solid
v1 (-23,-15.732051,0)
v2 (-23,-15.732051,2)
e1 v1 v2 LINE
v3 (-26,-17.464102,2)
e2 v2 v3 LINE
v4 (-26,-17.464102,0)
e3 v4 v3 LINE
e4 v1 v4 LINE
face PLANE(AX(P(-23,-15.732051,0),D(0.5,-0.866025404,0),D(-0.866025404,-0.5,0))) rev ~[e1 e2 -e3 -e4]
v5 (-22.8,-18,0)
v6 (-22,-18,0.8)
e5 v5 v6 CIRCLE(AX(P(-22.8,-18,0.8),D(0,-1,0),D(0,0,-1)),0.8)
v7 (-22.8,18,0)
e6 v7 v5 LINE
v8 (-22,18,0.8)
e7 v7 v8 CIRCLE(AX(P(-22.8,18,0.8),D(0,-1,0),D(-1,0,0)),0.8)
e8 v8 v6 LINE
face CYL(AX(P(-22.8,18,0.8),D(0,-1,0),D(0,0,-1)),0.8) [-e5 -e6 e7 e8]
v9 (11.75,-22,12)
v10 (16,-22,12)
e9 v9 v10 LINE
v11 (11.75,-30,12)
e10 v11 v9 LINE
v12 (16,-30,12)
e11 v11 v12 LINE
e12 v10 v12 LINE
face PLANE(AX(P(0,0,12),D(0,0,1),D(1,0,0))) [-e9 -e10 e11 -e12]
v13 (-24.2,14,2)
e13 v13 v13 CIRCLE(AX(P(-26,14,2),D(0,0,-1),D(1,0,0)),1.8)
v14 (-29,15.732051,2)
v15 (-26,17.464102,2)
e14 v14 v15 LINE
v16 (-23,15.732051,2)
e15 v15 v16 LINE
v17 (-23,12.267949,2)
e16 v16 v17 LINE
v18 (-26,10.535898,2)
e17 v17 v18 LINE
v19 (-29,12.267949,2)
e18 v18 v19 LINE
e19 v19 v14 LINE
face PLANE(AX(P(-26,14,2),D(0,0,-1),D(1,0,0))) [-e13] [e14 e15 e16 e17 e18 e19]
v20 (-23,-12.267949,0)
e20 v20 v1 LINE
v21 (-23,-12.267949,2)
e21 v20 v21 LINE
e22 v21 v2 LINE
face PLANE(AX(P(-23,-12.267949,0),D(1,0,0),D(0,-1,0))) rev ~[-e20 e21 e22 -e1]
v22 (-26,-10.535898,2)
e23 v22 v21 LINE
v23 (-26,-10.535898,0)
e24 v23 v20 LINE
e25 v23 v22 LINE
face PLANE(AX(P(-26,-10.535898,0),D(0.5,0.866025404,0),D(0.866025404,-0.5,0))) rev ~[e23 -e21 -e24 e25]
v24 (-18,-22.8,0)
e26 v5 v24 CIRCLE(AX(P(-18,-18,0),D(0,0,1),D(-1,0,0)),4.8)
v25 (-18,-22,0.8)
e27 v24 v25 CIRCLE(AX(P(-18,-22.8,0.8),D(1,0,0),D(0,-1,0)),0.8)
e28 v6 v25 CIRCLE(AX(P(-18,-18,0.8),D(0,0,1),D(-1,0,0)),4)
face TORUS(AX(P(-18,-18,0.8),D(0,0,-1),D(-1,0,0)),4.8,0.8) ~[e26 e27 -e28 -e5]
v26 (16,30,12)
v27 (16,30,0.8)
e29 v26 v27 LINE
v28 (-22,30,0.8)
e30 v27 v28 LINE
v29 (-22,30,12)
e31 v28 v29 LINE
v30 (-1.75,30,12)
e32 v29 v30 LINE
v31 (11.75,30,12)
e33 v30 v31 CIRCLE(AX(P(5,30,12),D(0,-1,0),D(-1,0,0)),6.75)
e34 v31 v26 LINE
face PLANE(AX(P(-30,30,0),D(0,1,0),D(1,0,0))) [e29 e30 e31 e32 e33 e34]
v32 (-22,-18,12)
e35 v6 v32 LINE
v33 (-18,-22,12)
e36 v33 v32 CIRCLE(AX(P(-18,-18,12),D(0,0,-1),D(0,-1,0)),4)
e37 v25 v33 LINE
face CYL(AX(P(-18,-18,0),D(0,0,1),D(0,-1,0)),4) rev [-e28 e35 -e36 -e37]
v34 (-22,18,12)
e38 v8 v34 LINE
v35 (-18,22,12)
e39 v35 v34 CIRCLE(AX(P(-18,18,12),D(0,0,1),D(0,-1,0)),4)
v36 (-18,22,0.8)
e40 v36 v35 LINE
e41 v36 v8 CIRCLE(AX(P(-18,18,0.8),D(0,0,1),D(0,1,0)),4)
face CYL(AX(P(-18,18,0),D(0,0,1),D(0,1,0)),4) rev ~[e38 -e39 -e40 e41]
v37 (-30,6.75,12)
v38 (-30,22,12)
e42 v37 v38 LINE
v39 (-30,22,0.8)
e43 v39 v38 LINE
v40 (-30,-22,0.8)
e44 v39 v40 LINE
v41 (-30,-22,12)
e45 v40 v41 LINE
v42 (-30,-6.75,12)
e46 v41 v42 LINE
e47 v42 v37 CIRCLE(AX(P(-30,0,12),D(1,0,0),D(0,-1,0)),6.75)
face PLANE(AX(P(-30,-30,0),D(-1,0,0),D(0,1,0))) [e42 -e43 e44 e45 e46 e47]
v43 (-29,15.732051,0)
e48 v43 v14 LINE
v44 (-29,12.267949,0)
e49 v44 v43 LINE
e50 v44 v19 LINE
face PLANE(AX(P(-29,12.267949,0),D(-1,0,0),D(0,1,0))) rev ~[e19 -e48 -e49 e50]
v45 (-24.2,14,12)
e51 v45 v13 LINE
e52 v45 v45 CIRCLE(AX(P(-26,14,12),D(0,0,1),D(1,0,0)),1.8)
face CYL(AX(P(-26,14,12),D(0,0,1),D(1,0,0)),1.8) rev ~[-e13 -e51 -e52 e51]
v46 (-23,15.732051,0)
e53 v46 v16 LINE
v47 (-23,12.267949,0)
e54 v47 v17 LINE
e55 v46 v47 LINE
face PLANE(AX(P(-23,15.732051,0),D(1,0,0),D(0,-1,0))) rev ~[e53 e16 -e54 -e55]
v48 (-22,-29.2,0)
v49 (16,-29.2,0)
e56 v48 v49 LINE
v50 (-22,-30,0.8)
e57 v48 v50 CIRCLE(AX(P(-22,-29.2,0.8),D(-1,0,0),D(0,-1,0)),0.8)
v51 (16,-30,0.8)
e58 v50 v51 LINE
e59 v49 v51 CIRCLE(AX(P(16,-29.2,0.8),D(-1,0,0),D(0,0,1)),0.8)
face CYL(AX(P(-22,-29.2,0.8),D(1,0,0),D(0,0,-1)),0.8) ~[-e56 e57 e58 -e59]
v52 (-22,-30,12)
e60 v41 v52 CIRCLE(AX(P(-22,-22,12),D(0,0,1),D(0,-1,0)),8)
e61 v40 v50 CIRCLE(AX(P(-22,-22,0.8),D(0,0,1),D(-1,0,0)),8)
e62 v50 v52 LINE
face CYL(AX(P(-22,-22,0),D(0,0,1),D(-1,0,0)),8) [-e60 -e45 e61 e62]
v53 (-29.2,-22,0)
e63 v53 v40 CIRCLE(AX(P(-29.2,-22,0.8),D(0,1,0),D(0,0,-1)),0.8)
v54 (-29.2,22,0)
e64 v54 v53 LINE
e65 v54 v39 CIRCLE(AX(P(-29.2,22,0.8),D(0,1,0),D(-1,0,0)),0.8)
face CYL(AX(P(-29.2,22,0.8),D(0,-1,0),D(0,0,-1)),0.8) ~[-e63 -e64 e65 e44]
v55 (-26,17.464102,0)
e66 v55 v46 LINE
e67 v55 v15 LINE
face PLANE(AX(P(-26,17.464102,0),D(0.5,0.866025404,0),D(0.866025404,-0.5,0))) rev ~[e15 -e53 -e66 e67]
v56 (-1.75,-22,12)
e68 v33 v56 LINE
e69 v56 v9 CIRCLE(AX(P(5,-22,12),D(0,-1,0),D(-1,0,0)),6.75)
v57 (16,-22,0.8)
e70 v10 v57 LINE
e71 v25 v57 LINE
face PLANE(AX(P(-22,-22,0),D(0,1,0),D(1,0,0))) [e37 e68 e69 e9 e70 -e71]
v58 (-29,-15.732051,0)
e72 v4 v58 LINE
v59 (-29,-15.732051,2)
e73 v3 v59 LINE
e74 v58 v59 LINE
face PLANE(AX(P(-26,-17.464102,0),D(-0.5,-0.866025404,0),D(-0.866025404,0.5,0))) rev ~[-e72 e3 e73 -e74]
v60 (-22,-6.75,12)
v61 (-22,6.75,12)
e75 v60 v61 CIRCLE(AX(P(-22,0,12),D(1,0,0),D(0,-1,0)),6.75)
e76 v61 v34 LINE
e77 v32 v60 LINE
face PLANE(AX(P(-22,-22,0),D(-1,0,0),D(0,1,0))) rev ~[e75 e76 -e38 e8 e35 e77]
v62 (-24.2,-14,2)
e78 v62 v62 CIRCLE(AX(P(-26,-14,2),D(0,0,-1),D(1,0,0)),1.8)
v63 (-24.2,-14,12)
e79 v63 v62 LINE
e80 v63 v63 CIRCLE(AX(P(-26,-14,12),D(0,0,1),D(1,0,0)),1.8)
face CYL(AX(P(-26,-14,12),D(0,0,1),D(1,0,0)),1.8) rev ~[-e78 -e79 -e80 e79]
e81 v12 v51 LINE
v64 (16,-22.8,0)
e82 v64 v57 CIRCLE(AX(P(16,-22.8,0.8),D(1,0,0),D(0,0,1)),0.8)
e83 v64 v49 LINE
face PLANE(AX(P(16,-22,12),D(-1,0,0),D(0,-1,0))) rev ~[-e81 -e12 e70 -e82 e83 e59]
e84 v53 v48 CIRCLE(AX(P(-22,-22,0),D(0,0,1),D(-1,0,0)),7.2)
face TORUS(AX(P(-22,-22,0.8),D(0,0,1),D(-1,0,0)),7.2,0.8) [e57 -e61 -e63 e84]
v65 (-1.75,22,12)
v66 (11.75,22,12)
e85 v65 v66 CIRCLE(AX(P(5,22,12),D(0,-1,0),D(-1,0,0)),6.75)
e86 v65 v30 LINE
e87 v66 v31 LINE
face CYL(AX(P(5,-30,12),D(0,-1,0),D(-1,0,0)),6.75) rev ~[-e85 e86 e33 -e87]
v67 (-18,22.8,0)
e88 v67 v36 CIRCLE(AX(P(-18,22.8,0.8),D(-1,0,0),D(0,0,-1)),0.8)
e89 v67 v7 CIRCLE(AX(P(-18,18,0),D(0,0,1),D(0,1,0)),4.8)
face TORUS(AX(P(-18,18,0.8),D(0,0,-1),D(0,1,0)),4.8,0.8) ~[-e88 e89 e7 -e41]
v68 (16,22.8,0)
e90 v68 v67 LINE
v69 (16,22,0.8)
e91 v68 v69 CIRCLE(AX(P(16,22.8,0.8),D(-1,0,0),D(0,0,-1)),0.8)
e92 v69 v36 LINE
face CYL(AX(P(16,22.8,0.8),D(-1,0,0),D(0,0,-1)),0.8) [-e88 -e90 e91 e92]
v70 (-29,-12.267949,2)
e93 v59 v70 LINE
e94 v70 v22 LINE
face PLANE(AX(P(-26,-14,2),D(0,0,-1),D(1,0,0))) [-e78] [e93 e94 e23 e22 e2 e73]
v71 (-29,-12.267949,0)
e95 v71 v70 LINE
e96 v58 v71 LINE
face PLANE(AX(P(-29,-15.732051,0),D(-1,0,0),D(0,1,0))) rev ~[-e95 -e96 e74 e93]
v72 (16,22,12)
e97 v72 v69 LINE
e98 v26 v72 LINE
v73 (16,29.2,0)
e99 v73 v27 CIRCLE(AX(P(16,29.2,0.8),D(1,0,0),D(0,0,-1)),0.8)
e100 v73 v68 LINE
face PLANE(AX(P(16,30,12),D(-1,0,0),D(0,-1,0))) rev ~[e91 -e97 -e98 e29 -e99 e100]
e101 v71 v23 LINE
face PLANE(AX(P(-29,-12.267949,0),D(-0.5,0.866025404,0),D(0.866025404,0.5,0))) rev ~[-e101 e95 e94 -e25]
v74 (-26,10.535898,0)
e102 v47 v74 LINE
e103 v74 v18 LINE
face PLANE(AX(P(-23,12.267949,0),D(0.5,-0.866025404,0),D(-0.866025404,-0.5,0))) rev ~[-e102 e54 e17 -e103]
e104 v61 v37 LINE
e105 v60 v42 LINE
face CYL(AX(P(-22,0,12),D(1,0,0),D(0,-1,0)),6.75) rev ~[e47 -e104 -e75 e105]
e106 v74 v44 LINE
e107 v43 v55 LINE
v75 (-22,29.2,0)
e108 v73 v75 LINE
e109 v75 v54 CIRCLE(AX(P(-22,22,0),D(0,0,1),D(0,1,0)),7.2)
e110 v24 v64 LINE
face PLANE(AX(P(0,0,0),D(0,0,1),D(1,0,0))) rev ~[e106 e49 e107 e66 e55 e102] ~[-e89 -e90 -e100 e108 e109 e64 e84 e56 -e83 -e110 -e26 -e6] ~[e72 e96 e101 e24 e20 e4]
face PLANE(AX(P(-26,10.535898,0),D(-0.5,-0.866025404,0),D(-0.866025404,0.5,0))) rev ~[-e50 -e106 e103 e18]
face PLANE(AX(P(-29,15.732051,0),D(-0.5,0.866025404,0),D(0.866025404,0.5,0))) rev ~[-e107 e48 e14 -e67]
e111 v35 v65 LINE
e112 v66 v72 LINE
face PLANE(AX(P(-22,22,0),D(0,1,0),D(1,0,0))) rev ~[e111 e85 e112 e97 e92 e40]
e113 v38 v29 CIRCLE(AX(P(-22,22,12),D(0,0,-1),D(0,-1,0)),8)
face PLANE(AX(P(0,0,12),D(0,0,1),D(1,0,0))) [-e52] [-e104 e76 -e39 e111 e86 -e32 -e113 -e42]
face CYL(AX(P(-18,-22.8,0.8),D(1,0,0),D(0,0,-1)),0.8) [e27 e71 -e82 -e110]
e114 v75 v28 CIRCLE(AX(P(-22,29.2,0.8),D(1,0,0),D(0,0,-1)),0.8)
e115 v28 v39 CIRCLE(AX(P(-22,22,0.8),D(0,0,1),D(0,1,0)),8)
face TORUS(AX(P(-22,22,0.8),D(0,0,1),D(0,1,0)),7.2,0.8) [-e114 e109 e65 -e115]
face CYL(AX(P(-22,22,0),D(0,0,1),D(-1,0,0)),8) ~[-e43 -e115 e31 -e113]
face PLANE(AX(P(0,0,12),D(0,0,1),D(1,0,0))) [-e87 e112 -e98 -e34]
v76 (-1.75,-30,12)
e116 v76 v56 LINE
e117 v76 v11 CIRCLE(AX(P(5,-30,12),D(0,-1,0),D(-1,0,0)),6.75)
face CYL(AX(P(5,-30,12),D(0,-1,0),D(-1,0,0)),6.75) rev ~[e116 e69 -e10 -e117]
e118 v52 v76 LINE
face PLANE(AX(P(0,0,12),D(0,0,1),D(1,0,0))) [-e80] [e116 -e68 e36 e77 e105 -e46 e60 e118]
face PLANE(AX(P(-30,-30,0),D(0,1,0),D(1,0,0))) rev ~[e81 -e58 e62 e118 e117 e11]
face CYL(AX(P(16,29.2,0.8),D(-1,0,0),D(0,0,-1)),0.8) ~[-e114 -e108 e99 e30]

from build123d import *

# Parameters (mm, degrees)
F0_W      = 60
F0_H      = 60
F0_W_2    = 44
F0_H_2    = 44
F1_DEPTH  = 12
F3_DEPTH  = 25
F4_R      = 8
F5_R      = 4
F7_DEPTH  = 25
F9_DEPTH  = 60.001
F10_R     = 1.8
F11_DEPTH = 25
F12_R     = 0.8
F13_R     = 1.8
F14_DEPTH = 2


# Not quite as in the source:
# - a feature names something its author has since deleted; it is built from what else it names


with BuildPart() as f1:
    # F0 (on Top) → F1 (new body)
    with BuildSketch(Plane.XY):
        Rectangle(F0_W, F0_H)
        Rectangle(F0_W_2, F0_H_2, mode=Mode.SUBTRACT)
    extrude(amount=F1_DEPTH)

    # F2 (on face) → F3 (cut)
    with BuildSketch(Plane.XY.offset(12)):
        Polygon((30, -30), (30, 30), (16, 30), (16, 22), (22, 22), (22, -22), (16, -22), (16, -30), align=None)
    extrude(amount=-F3_DEPTH, mode=Mode.SUBTRACT)

    # F4
    f4_edges = [f1.edges().sort_by_distance(p)[0] for p in [
        (-30, -30, 6),
        (-30, 30, 6),
    ]]
    fillet(f4_edges, radius=F4_R)

    # F5
    f5_edges = [f1.edges().sort_by_distance(p)[0] for p in [
        (-22, 22, 6),
        (-22, -22, 6),
    ]]
    fillet(f5_edges, radius=F5_R)

    # F6 (on face) → F7 (cut)
    with BuildSketch(Plane.YZ.offset(-22)):
        with BuildLine():
            ThreePointArc((-6.75, 12), (0, 5.25), (6.75, 12))
            Line((6.75, 12), (-6.75, 12))
        make_face()
    extrude(amount=-F7_DEPTH, mode=Mode.SUBTRACT)

    # F8 (on face) → F9 (cut, through all)
    with BuildSketch(Plane.XZ.offset(30)):
        with BuildLine():
            ThreePointArc((-1.75, 12), (5, 5.25), (11.75, 12))
            Line((11.75, 12), (-1.75, 12))
        make_face()
    extrude(amount=-F9_DEPTH, mode=Mode.SUBTRACT)

    # F10 (on face) → F11 (cut)
    with BuildSketch(Plane.XY.offset(12)):
        with Locations((-26, 14)):
            Circle(F10_R)
        with Locations((-26, -14)):
            Circle(F10_R)
    extrude(amount=-F11_DEPTH, mode=Mode.SUBTRACT)

    # F12
    f12_edges = [f1.edges().sort_by_distance(p)[0] for p in [
        (-3, -30, 0),
        (-20.828427, 20.828427, 0),
    ]]
    fillet(f12_edges, radius=F12_R)

    # F13 (on face) → F14 (cut)
    with BuildSketch(Plane(origin=(0, 0, 0), x_dir=(1, 0, 0), z_dir=(0, 0, -1))):
        Polygon((-23, 12.2679491924), (-23, 15.7320508076), (-26, 17.4641016151), (-29, 15.7320508076), (-29, 12.2679491924), (-26, 10.5358983849), align=None)
        with Locations((-26, 14)):
            Circle(F13_R, mode=Mode.SUBTRACT)
        Polygon((-26, -17.4641016151), (-23, -15.7320508076), (-23, -12.2679491924), (-26, -10.5358983849), (-29, -12.2679491924), (-29, -15.7320508076), align=None)
        with Locations((-26, -14)):
            Circle(F13_R, mode=Mode.SUBTRACT)
    extrude(amount=-F14_DEPTH, mode=Mode.SUBTRACT)


solid = f1.part
